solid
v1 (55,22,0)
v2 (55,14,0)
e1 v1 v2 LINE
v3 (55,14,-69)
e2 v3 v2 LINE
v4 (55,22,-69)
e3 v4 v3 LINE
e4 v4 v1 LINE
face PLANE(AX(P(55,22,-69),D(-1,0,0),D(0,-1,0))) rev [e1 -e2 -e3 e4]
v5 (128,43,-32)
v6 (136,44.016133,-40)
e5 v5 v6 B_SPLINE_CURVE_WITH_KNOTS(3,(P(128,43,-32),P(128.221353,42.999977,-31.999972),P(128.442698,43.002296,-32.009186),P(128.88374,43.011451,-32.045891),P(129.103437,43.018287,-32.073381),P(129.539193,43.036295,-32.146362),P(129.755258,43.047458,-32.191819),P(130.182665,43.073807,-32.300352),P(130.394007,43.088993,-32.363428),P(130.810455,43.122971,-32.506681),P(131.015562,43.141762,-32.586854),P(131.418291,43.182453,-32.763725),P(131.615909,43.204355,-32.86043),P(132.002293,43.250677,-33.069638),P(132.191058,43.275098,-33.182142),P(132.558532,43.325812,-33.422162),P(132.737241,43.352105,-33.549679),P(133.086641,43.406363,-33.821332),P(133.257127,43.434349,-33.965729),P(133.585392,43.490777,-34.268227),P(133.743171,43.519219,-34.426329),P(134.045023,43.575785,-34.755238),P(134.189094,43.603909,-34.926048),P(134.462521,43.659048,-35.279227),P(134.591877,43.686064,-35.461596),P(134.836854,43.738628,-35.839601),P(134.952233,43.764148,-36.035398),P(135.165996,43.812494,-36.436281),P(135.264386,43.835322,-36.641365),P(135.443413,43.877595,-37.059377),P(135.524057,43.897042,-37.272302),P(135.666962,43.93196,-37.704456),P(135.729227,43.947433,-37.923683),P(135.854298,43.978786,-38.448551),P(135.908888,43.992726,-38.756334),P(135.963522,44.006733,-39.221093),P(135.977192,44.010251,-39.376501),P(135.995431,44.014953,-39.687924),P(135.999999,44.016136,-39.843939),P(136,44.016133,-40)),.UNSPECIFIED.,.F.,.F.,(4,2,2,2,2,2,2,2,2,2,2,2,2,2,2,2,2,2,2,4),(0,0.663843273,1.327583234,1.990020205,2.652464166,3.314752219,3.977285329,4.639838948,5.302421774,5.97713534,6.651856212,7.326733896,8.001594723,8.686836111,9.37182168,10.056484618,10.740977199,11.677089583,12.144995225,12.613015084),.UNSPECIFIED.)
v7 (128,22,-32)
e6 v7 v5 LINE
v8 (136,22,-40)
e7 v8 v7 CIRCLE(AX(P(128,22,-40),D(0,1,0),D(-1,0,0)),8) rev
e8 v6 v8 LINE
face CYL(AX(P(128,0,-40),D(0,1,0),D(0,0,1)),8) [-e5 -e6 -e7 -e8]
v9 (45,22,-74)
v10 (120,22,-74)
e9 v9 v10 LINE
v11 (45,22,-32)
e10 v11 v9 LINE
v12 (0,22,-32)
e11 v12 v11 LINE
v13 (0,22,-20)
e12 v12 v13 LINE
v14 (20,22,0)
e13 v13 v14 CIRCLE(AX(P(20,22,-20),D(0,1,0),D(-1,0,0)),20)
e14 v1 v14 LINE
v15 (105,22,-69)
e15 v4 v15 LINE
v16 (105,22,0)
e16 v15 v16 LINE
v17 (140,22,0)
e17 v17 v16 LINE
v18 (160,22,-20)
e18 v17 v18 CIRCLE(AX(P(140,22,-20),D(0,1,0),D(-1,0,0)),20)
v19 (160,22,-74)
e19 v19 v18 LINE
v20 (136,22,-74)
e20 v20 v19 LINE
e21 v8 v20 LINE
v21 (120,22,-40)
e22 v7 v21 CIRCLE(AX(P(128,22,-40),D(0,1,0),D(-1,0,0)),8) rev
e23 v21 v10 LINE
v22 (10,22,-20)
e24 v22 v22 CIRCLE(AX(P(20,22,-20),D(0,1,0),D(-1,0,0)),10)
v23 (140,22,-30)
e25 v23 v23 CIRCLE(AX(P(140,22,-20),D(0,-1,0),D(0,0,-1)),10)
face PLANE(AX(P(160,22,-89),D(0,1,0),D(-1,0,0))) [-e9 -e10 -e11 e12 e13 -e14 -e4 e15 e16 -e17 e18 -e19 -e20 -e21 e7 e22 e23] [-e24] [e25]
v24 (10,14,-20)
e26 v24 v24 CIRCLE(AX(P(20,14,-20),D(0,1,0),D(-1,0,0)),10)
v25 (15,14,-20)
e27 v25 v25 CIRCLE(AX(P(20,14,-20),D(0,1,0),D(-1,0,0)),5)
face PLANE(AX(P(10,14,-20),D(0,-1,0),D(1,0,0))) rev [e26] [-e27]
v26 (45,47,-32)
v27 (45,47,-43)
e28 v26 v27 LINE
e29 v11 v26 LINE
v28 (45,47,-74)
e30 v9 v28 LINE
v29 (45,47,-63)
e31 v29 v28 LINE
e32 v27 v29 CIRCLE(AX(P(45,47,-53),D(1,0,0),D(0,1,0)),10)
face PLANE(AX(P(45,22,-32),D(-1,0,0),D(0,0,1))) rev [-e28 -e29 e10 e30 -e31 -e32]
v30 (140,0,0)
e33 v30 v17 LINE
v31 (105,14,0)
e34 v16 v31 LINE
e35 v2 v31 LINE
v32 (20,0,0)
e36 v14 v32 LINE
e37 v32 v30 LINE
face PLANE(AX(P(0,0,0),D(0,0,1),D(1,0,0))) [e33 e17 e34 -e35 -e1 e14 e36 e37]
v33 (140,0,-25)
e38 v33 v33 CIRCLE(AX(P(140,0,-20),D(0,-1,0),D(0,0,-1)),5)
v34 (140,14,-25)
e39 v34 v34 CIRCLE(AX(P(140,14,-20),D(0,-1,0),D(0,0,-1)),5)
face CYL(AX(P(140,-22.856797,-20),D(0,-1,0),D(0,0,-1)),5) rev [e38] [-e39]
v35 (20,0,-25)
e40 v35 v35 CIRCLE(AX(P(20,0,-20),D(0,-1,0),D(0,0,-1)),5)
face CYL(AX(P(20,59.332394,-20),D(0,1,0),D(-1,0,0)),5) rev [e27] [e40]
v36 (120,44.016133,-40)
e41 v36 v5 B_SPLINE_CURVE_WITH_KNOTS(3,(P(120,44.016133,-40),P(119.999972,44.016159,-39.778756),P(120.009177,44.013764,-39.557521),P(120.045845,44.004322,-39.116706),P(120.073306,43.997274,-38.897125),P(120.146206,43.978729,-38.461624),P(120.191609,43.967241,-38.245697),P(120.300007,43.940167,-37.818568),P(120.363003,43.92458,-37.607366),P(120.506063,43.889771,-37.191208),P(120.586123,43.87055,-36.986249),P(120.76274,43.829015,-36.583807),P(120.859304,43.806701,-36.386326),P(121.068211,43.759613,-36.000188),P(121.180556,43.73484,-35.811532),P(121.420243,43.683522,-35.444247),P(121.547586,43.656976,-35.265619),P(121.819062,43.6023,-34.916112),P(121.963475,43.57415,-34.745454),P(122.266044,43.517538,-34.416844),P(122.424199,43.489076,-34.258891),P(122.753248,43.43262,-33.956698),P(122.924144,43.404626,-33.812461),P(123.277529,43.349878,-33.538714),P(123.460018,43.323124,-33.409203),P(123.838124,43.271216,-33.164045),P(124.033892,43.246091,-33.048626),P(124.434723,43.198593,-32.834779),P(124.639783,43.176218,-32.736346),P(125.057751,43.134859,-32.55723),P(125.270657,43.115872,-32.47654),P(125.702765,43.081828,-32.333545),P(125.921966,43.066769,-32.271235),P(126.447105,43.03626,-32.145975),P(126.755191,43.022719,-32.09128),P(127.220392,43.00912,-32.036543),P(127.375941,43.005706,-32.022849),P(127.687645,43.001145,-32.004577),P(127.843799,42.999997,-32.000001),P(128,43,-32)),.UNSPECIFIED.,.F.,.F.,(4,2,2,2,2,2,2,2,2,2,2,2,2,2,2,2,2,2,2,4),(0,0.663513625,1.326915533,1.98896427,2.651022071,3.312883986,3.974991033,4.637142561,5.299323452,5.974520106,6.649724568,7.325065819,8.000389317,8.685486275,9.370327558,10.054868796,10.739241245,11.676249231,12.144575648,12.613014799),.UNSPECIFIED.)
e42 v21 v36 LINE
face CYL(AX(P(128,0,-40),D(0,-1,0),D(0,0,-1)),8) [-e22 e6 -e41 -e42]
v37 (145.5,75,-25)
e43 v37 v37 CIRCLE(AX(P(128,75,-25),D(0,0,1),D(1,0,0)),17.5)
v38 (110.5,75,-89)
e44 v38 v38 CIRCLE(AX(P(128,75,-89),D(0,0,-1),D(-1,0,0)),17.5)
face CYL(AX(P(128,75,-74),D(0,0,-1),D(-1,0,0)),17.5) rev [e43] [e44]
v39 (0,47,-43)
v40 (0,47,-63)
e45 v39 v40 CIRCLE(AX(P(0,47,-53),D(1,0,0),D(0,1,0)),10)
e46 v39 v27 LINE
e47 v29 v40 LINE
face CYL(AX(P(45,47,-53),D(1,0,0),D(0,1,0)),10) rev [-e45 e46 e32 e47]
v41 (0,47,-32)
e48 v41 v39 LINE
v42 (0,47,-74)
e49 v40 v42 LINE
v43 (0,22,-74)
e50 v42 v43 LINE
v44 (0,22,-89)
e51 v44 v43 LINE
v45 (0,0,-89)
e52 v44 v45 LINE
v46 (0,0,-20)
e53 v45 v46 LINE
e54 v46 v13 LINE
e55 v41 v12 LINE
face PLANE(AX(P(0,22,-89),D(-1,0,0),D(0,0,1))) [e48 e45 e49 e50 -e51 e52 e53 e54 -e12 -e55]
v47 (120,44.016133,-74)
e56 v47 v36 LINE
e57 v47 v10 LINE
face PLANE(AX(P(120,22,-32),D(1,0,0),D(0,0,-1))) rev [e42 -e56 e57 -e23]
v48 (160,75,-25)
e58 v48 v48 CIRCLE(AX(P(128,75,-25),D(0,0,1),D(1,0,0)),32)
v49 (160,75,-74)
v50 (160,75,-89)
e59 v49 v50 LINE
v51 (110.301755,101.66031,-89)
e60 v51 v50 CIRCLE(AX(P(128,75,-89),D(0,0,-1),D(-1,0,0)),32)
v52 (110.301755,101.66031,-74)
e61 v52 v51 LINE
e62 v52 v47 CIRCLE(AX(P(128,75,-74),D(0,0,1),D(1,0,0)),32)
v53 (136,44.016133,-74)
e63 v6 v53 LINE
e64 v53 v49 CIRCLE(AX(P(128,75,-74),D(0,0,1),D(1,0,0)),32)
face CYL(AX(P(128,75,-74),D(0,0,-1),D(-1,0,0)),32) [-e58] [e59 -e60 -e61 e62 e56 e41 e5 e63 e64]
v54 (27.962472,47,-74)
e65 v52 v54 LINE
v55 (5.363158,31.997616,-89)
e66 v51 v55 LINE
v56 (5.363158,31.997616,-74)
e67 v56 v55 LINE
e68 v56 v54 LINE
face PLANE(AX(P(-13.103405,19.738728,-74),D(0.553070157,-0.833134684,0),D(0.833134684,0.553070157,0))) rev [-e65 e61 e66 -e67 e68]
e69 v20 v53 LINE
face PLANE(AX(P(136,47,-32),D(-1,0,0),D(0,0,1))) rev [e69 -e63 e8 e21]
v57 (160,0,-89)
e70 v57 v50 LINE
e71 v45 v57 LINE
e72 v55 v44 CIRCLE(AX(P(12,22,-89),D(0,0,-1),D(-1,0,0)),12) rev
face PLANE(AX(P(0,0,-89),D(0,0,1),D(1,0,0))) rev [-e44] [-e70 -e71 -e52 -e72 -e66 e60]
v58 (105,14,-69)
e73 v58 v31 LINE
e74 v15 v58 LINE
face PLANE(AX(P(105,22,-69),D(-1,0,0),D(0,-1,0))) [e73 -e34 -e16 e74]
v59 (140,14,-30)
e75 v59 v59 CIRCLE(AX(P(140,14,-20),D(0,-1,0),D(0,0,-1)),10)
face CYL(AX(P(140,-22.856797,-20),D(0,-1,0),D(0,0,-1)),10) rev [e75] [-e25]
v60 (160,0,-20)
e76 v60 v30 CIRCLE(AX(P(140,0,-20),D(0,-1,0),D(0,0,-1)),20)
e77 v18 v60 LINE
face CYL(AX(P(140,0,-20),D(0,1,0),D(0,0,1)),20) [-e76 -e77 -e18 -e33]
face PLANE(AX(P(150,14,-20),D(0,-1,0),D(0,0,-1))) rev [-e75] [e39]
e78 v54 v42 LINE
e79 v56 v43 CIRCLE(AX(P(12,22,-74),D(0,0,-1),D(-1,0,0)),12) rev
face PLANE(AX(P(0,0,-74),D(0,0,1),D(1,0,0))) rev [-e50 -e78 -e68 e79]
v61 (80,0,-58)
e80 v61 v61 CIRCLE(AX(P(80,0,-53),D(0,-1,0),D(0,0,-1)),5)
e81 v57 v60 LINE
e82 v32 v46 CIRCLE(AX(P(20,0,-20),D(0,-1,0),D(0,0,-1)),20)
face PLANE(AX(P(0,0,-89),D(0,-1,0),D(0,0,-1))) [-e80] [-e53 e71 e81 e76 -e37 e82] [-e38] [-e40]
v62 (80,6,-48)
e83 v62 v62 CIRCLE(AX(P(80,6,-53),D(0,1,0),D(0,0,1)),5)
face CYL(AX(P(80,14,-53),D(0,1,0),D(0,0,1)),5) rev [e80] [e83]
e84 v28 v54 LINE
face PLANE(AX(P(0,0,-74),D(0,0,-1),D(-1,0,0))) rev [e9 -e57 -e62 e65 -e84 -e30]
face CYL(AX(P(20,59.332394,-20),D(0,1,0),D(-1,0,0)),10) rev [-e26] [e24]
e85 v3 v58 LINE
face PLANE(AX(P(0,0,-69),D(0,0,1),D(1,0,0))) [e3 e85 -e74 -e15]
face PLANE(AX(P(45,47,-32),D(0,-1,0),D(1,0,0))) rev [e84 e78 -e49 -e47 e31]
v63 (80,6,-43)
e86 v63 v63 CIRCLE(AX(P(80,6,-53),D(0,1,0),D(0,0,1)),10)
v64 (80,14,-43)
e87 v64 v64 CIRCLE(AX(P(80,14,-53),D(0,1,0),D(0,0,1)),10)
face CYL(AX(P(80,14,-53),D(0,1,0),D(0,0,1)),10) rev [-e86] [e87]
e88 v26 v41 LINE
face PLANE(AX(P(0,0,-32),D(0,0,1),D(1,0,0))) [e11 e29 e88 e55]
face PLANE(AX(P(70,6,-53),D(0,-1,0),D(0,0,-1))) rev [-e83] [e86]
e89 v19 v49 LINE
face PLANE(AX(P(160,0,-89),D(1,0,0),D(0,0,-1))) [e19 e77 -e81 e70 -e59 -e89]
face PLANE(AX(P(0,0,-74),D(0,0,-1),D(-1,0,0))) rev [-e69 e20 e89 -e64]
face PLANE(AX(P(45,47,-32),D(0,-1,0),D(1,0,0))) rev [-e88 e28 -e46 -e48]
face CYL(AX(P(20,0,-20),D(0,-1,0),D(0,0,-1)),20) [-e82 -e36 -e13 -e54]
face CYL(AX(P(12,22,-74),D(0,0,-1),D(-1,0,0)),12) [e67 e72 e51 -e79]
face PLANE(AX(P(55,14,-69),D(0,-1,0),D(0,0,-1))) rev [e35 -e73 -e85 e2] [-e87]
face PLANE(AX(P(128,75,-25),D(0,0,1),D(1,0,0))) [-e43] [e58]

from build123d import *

# Parameters (mm, degrees)
CROQUIS3_W              = 160
CROQUIS3_H              = 22
SALIENTE_EXTRUIR1_DEPTH = 89
CROQUIS6_W              = 50
CROQUIS6_H              = 8
CORTAR_EXTRUIR1_DEPTH   = 69
REDONDEO1_R             = 20
REDONDEO2_R             = 20
CROQUIS7_R              = 17.5
SALIENTE_EXTRUIR3_DEPTH = 15
CROQUIS8_R              = 32
CROQUIS8_R_2            = 17.5
SALIENTE_EXTRUIR4_DEPTH = 49
CROQUIS9_W              = 45
CROQUIS9_H              = 25
CROQUIS9_W_2            = 16
SALIENTE_EXTRUIR5_DEPTH = 42
REDONDEO3_R             = 8
REDONDEO4_R             = 8
CROQUIS10_W             = 45
CROQUIS10_H             = 10


with BuildPart() as part:
    # Croquis3 → Saliente-Extruir1 (new body)
    with BuildSketch(Plane.XY):
        with Locations((80, 11)):
            Rectangle(CROQUIS3_W, CROQUIS3_H)
    extrude(amount=-SALIENTE_EXTRUIR1_DEPTH)

    # Croquis6 → Cortar-Extruir1 (cut)
    with BuildSketch(Plane.XY):
        with Locations((80, 18)):
            Rectangle(CROQUIS6_W, CROQUIS6_H)
    extrude(amount=-CORTAR_EXTRUIR1_DEPTH, mode=Mode.SUBTRACT)

    # Redondeo1
    redondeo1_edges = [part.edges().sort_by_distance(p)[0] for p in [
        (160, 11, 0),
    ]]
    fillet(redondeo1_edges, radius=REDONDEO1_R)

    # Redondeo2
    redondeo2_edges = [part.edges().sort_by_distance(p)[0] for p in [
        (0, 11, 0),
    ]]
    fillet(redondeo2_edges, radius=REDONDEO2_R)



with BuildPart() as body_2:
    # Croquis7 → Saliente-Extruir3 (new body)
    with BuildSketch(Plane(origin=(0, 0, -89), x_dir=(-1, 0, 0), z_dir=(0, 0, -1))):
        with BuildLine():
            Line((0, 22), (-160, 22))
            Line((-160, 22), (-160, 75))
            ThreePointArc((-160, 75), (-143.127064471, 103.198792891), (-110.301754969, 101.660309879))
            Line((-110.301754969, 101.660309879), (-5.363158113, 31.997616205))
            ThreePointArc((-5.363158113, 31.997616205), (-1.425452666, 27.672649177), (0, 22))
        make_face()
        with Locations((-128, 75)):
            Circle(CROQUIS7_R, mode=Mode.SUBTRACT)
    extrude(amount=-SALIENTE_EXTRUIR3_DEPTH)

    # Croquis8 → Saliente-Extruir4 (add)
    with BuildSketch(Plane.XY.offset(-74)):
        with Locations((128, 75)):
            Circle(CROQUIS8_R)
        with Locations(Location((128, 75, 0), (0, 0, 180))):
            Circle(CROQUIS8_R_2, mode=Mode.SUBTRACT)
    extrude(amount=SALIENTE_EXTRUIR4_DEPTH)


with BuildPart() as part_1:
    add(part.part)

    add(body_2.part)  # Saliente-Extruir5 merges body 2
    # Croquis9 → Saliente-Extruir5 (add)
    with BuildSketch(Plane.XY.offset(-74)):
        with Locations((22.5, 34.5)):
            Rectangle(CROQUIS9_W, CROQUIS9_H)
        with Locations((128, 34.5)):
            Rectangle(CROQUIS9_W_2, CROQUIS9_H)
    extrude(amount=SALIENTE_EXTRUIR5_DEPTH)

    # Redondeo3
    redondeo3_edges = [part_1.edges().sort_by_distance(p)[0] for p in [
        (136, 33.008066615, -32),
    ]]
    fillet(redondeo3_edges, radius=REDONDEO3_R)

    # Redondeo4
    redondeo4_edges = [part_1.edges().sort_by_distance(p)[0] for p in [
        (120, 33.008066615, -32),
    ]]
    fillet(redondeo4_edges, radius=REDONDEO4_R - 0.0001)  # a hair under: the kernel refuses the full size

    # Croquis10 → Cortar-Revolución1 (revolve, cut)
    with BuildSketch(Plane.XY.offset(-53)):
        with Locations((22.5, 42)):
            Rectangle(CROQUIS10_W, CROQUIS10_H)
    revolve(axis=Axis((45, 47, -53), (-1, 0, 0)), mode=Mode.SUBTRACT)

    # Croquis14 → Cortar-Revolución2 (revolve, cut)
    with BuildSketch(Plane.XY.offset(-53), mode=Mode.PRIVATE) as cortar_revoluci_n2_sk:
        Polygon((70, 14), (70, 6), (75, 6), (75, -24.123756484), (80, -24.123756484), (80, 14), align=None)
    revolve(cortar_revoluci_n2_sk.sketch.rotate(Axis((80, 14, -53), (0, -1, 0)), 270), axis=Axis((80, 14, -53), (0, -1, 0)), mode=Mode.SUBTRACT)

    # Croquis16 → Cortar-Revolución3 (revolve, cut)
    with BuildSketch(Plane.XY.offset(-20)):
        Polygon((10, 22), (10, 14), (15, 14), (15, -14.561047929), (20, -14.561047929), (20, 22), align=None)
    revolve(axis=Axis((20, 59.332394472, -20), (0, -1, 0)), mode=Mode.SUBTRACT)

    # Croquis17 → Cortar-Revolución4 (revolve, cut)
    with BuildSketch(Plane.XY.offset(-20), mode=Mode.PRIVATE) as cortar_revoluci_n4_sk:
        Polygon((140, 22), (150, 22), (150, 14), (145, 14), (145, 0), (140, 0), align=None)
    revolve(cortar_revoluci_n4_sk.sketch.rotate(Axis((140, -22.856797355, -20), (0, 1, 0)), 90), axis=Axis((140, -22.856797355, -20), (0, 1, 0)), mode=Mode.SUBTRACT)


solid = part_1.part
